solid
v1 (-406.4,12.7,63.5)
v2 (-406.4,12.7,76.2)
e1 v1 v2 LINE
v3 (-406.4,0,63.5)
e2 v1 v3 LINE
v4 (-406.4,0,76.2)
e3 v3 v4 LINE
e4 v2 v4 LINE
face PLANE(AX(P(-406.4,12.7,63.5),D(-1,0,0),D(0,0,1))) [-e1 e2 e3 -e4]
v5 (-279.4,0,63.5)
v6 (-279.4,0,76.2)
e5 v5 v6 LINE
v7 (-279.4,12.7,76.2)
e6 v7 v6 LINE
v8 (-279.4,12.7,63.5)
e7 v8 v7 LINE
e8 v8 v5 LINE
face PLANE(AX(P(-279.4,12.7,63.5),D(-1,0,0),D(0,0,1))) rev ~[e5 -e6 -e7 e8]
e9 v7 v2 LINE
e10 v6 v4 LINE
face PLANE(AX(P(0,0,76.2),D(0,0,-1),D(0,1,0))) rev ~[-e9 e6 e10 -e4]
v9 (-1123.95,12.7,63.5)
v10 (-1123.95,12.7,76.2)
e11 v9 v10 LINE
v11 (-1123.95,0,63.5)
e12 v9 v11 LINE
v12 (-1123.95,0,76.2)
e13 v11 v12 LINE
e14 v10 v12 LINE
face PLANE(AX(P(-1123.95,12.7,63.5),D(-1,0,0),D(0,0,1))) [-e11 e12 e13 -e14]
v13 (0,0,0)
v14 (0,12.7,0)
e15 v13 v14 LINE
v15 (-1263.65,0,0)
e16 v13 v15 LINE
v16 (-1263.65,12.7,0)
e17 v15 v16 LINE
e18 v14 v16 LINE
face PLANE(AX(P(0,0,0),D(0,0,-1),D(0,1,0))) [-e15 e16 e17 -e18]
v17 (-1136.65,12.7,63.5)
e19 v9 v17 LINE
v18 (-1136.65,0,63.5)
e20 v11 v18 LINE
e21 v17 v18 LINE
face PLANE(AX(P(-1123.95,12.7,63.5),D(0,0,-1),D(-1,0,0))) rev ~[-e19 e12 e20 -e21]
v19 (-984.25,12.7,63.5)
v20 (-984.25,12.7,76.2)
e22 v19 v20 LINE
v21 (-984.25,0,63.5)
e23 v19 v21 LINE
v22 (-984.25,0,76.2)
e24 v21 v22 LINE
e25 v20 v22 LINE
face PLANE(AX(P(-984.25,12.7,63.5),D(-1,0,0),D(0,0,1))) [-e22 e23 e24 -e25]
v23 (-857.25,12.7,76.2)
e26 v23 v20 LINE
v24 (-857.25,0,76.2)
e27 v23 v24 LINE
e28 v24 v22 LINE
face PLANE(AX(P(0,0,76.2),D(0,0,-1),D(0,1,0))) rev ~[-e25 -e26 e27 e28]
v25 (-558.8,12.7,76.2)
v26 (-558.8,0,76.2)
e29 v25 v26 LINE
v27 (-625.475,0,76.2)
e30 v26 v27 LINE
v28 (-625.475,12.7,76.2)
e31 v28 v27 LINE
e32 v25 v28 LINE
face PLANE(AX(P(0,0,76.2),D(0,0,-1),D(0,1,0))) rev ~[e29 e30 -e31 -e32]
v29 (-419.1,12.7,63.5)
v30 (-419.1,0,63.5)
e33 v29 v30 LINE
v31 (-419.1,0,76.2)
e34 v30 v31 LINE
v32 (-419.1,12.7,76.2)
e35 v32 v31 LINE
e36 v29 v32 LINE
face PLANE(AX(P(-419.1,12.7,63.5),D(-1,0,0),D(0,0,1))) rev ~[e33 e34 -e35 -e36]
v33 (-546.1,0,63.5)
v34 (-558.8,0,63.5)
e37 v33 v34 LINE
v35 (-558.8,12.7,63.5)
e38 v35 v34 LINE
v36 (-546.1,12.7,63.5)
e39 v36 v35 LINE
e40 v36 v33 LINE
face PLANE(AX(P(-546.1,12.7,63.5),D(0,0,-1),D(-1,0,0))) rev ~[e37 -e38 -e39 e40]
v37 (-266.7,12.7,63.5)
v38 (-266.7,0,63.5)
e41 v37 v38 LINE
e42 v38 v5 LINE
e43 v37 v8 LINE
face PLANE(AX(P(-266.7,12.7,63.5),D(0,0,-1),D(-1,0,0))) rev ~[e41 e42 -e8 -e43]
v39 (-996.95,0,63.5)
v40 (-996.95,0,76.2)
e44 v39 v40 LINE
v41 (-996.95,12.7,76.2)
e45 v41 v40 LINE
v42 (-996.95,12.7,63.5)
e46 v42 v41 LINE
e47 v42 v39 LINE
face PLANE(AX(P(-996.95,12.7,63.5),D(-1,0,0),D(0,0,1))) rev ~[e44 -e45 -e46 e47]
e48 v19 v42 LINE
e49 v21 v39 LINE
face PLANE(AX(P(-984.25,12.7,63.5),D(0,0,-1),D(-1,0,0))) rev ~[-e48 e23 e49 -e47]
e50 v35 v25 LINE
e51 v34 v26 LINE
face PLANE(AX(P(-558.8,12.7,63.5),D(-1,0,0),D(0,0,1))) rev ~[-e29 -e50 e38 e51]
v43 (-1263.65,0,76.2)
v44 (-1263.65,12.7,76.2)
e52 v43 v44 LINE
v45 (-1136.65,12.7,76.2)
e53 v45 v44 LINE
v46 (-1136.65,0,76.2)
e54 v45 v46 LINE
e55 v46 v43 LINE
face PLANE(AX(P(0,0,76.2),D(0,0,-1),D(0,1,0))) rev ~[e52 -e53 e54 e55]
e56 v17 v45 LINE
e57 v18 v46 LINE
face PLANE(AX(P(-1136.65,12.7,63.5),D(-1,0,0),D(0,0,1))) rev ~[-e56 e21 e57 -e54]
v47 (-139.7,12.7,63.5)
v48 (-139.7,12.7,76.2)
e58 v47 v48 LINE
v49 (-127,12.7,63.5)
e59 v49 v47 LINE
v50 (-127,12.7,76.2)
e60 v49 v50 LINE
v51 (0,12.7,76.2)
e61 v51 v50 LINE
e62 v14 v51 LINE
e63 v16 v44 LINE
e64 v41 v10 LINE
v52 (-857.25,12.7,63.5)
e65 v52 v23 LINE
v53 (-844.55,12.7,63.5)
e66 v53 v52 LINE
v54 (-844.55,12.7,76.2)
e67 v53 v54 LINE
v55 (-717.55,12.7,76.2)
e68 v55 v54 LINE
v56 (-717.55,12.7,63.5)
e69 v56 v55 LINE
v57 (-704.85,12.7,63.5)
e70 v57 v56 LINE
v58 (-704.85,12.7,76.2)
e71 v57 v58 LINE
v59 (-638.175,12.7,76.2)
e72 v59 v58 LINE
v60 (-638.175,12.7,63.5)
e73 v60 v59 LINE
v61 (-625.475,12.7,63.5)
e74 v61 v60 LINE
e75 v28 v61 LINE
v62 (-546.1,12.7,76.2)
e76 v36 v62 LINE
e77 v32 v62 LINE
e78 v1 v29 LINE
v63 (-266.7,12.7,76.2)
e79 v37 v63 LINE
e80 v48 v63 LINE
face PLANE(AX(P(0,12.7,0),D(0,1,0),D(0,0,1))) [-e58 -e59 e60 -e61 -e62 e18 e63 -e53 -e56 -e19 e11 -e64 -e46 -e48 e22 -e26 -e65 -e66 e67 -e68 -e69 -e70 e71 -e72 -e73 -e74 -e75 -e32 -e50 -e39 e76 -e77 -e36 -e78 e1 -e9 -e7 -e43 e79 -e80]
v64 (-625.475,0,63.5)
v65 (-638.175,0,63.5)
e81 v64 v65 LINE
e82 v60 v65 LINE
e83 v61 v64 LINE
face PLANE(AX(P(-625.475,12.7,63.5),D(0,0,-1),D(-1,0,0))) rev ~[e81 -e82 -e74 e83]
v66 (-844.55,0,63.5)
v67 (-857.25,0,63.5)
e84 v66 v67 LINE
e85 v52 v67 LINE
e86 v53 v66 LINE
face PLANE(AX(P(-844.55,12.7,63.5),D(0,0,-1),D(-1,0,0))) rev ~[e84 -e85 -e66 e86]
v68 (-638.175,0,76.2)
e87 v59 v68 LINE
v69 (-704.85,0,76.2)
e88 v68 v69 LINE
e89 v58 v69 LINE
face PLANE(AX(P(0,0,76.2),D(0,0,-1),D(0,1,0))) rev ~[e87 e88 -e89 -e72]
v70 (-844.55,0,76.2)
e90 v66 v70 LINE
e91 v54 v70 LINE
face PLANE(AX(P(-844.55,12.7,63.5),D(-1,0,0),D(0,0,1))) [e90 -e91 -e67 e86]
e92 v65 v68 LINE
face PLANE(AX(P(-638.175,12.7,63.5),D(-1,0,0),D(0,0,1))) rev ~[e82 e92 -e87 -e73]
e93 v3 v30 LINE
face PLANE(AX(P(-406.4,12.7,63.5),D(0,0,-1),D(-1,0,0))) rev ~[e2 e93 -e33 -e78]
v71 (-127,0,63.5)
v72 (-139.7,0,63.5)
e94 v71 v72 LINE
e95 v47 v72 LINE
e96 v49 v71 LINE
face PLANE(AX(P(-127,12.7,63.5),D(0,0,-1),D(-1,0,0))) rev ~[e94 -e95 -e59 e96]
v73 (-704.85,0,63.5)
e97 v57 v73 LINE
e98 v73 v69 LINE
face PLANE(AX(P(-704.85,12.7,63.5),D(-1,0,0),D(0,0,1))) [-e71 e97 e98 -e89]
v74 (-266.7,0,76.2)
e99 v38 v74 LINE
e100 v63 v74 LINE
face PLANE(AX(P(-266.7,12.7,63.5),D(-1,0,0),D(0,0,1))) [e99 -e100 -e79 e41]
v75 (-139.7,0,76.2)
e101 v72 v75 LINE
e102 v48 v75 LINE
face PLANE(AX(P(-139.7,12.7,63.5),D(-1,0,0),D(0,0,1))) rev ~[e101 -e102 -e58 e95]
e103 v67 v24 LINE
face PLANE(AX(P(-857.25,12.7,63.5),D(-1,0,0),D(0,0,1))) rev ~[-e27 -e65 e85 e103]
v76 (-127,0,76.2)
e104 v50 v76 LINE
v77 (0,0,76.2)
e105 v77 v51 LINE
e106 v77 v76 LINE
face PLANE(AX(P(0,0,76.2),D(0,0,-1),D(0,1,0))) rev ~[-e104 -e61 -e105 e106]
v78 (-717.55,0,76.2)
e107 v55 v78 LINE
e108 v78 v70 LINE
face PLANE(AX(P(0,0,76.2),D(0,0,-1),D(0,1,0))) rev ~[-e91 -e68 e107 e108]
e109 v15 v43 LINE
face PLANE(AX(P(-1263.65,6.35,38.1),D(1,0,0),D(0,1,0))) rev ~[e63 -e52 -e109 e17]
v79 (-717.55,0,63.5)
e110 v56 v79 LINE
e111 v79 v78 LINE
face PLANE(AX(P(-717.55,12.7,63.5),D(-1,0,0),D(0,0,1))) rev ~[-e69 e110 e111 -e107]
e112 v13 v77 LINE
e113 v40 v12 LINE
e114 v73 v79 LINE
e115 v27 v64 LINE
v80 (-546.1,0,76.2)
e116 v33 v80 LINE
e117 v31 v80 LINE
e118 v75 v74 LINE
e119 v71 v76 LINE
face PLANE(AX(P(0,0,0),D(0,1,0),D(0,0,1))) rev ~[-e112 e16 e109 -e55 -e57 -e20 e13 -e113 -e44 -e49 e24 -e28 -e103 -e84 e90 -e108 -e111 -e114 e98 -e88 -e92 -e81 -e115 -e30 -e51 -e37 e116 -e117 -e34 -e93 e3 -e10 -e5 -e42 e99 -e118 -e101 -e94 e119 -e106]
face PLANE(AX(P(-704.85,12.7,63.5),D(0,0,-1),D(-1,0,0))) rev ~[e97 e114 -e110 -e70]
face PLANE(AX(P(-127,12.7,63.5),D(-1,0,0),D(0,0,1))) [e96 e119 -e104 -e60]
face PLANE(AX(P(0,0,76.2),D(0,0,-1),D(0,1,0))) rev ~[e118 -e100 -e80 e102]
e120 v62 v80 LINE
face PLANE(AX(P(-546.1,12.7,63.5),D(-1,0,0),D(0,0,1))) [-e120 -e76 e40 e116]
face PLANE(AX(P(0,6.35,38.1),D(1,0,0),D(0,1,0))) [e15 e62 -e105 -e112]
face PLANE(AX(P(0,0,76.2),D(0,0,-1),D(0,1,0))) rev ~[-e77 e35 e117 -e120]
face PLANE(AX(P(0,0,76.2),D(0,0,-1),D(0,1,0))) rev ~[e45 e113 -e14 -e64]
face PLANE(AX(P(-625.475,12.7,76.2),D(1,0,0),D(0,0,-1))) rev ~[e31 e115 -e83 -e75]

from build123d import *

# Parameters (mm, degrees)
F0_W     = 12.7
F0_H     = 76.2
F1_DEPTH = 1263.65
F2_W     = 12.7
F2_H     = 12.7
F3_DEPTH = 12.7
F5_DEPTH = 12.7


# Not quite as in the source:
# - a feature names something its author has since deleted; it is built from what else it names


with BuildPart() as f1:
    # F0 (on Right) → F1 (new body)
    with BuildSketch(Plane.YZ):
        with Locations((6.35, 38.1)):
            Rectangle(F0_W, F0_H)
    extrude(amount=-F1_DEPTH)

    # F2 (on face) → F3 (cut)
    with BuildSketch(Plane(origin=(0, 12.7, 0), x_dir=(-1, 0, 0), z_dir=(0, 1, 0))):
        with Locations((133.35, 69.85)):
            Rectangle(F2_W, F2_H)
        with Locations((273.05, 69.85)):
            Rectangle(F2_W, F2_H)
        with Locations((412.75, 69.85)):
            Rectangle(F2_W, F2_H)
        with Locations((552.45, 69.85)):
            Rectangle(F2_W, F2_H)
        with Locations((711.2, 69.85)):
            Rectangle(F2_W, F2_H)
        with Locations((850.9, 69.85)):
            Rectangle(F2_W, F2_H)
        with Locations((990.6, 69.85)):
            Rectangle(F2_W, F2_H)
        with Locations((1130.3, 69.85)):
            Rectangle(F2_W, F2_H)
    extrude(amount=-F3_DEPTH, mode=Mode.SUBTRACT)

    # F4 (on face) → F5 (cut)
    with BuildSketch(Plane(origin=(0, 12.7, 0), x_dir=(-1, 0, 0), z_dir=(0, 1, 0))):
        Polygon((631.825, 76.2), (625.475, 76.2), (625.475, 63.5), (638.175, 63.5), (638.175, 76.2), align=None)
    extrude(amount=-F5_DEPTH, mode=Mode.SUBTRACT)


solid = f1.part
